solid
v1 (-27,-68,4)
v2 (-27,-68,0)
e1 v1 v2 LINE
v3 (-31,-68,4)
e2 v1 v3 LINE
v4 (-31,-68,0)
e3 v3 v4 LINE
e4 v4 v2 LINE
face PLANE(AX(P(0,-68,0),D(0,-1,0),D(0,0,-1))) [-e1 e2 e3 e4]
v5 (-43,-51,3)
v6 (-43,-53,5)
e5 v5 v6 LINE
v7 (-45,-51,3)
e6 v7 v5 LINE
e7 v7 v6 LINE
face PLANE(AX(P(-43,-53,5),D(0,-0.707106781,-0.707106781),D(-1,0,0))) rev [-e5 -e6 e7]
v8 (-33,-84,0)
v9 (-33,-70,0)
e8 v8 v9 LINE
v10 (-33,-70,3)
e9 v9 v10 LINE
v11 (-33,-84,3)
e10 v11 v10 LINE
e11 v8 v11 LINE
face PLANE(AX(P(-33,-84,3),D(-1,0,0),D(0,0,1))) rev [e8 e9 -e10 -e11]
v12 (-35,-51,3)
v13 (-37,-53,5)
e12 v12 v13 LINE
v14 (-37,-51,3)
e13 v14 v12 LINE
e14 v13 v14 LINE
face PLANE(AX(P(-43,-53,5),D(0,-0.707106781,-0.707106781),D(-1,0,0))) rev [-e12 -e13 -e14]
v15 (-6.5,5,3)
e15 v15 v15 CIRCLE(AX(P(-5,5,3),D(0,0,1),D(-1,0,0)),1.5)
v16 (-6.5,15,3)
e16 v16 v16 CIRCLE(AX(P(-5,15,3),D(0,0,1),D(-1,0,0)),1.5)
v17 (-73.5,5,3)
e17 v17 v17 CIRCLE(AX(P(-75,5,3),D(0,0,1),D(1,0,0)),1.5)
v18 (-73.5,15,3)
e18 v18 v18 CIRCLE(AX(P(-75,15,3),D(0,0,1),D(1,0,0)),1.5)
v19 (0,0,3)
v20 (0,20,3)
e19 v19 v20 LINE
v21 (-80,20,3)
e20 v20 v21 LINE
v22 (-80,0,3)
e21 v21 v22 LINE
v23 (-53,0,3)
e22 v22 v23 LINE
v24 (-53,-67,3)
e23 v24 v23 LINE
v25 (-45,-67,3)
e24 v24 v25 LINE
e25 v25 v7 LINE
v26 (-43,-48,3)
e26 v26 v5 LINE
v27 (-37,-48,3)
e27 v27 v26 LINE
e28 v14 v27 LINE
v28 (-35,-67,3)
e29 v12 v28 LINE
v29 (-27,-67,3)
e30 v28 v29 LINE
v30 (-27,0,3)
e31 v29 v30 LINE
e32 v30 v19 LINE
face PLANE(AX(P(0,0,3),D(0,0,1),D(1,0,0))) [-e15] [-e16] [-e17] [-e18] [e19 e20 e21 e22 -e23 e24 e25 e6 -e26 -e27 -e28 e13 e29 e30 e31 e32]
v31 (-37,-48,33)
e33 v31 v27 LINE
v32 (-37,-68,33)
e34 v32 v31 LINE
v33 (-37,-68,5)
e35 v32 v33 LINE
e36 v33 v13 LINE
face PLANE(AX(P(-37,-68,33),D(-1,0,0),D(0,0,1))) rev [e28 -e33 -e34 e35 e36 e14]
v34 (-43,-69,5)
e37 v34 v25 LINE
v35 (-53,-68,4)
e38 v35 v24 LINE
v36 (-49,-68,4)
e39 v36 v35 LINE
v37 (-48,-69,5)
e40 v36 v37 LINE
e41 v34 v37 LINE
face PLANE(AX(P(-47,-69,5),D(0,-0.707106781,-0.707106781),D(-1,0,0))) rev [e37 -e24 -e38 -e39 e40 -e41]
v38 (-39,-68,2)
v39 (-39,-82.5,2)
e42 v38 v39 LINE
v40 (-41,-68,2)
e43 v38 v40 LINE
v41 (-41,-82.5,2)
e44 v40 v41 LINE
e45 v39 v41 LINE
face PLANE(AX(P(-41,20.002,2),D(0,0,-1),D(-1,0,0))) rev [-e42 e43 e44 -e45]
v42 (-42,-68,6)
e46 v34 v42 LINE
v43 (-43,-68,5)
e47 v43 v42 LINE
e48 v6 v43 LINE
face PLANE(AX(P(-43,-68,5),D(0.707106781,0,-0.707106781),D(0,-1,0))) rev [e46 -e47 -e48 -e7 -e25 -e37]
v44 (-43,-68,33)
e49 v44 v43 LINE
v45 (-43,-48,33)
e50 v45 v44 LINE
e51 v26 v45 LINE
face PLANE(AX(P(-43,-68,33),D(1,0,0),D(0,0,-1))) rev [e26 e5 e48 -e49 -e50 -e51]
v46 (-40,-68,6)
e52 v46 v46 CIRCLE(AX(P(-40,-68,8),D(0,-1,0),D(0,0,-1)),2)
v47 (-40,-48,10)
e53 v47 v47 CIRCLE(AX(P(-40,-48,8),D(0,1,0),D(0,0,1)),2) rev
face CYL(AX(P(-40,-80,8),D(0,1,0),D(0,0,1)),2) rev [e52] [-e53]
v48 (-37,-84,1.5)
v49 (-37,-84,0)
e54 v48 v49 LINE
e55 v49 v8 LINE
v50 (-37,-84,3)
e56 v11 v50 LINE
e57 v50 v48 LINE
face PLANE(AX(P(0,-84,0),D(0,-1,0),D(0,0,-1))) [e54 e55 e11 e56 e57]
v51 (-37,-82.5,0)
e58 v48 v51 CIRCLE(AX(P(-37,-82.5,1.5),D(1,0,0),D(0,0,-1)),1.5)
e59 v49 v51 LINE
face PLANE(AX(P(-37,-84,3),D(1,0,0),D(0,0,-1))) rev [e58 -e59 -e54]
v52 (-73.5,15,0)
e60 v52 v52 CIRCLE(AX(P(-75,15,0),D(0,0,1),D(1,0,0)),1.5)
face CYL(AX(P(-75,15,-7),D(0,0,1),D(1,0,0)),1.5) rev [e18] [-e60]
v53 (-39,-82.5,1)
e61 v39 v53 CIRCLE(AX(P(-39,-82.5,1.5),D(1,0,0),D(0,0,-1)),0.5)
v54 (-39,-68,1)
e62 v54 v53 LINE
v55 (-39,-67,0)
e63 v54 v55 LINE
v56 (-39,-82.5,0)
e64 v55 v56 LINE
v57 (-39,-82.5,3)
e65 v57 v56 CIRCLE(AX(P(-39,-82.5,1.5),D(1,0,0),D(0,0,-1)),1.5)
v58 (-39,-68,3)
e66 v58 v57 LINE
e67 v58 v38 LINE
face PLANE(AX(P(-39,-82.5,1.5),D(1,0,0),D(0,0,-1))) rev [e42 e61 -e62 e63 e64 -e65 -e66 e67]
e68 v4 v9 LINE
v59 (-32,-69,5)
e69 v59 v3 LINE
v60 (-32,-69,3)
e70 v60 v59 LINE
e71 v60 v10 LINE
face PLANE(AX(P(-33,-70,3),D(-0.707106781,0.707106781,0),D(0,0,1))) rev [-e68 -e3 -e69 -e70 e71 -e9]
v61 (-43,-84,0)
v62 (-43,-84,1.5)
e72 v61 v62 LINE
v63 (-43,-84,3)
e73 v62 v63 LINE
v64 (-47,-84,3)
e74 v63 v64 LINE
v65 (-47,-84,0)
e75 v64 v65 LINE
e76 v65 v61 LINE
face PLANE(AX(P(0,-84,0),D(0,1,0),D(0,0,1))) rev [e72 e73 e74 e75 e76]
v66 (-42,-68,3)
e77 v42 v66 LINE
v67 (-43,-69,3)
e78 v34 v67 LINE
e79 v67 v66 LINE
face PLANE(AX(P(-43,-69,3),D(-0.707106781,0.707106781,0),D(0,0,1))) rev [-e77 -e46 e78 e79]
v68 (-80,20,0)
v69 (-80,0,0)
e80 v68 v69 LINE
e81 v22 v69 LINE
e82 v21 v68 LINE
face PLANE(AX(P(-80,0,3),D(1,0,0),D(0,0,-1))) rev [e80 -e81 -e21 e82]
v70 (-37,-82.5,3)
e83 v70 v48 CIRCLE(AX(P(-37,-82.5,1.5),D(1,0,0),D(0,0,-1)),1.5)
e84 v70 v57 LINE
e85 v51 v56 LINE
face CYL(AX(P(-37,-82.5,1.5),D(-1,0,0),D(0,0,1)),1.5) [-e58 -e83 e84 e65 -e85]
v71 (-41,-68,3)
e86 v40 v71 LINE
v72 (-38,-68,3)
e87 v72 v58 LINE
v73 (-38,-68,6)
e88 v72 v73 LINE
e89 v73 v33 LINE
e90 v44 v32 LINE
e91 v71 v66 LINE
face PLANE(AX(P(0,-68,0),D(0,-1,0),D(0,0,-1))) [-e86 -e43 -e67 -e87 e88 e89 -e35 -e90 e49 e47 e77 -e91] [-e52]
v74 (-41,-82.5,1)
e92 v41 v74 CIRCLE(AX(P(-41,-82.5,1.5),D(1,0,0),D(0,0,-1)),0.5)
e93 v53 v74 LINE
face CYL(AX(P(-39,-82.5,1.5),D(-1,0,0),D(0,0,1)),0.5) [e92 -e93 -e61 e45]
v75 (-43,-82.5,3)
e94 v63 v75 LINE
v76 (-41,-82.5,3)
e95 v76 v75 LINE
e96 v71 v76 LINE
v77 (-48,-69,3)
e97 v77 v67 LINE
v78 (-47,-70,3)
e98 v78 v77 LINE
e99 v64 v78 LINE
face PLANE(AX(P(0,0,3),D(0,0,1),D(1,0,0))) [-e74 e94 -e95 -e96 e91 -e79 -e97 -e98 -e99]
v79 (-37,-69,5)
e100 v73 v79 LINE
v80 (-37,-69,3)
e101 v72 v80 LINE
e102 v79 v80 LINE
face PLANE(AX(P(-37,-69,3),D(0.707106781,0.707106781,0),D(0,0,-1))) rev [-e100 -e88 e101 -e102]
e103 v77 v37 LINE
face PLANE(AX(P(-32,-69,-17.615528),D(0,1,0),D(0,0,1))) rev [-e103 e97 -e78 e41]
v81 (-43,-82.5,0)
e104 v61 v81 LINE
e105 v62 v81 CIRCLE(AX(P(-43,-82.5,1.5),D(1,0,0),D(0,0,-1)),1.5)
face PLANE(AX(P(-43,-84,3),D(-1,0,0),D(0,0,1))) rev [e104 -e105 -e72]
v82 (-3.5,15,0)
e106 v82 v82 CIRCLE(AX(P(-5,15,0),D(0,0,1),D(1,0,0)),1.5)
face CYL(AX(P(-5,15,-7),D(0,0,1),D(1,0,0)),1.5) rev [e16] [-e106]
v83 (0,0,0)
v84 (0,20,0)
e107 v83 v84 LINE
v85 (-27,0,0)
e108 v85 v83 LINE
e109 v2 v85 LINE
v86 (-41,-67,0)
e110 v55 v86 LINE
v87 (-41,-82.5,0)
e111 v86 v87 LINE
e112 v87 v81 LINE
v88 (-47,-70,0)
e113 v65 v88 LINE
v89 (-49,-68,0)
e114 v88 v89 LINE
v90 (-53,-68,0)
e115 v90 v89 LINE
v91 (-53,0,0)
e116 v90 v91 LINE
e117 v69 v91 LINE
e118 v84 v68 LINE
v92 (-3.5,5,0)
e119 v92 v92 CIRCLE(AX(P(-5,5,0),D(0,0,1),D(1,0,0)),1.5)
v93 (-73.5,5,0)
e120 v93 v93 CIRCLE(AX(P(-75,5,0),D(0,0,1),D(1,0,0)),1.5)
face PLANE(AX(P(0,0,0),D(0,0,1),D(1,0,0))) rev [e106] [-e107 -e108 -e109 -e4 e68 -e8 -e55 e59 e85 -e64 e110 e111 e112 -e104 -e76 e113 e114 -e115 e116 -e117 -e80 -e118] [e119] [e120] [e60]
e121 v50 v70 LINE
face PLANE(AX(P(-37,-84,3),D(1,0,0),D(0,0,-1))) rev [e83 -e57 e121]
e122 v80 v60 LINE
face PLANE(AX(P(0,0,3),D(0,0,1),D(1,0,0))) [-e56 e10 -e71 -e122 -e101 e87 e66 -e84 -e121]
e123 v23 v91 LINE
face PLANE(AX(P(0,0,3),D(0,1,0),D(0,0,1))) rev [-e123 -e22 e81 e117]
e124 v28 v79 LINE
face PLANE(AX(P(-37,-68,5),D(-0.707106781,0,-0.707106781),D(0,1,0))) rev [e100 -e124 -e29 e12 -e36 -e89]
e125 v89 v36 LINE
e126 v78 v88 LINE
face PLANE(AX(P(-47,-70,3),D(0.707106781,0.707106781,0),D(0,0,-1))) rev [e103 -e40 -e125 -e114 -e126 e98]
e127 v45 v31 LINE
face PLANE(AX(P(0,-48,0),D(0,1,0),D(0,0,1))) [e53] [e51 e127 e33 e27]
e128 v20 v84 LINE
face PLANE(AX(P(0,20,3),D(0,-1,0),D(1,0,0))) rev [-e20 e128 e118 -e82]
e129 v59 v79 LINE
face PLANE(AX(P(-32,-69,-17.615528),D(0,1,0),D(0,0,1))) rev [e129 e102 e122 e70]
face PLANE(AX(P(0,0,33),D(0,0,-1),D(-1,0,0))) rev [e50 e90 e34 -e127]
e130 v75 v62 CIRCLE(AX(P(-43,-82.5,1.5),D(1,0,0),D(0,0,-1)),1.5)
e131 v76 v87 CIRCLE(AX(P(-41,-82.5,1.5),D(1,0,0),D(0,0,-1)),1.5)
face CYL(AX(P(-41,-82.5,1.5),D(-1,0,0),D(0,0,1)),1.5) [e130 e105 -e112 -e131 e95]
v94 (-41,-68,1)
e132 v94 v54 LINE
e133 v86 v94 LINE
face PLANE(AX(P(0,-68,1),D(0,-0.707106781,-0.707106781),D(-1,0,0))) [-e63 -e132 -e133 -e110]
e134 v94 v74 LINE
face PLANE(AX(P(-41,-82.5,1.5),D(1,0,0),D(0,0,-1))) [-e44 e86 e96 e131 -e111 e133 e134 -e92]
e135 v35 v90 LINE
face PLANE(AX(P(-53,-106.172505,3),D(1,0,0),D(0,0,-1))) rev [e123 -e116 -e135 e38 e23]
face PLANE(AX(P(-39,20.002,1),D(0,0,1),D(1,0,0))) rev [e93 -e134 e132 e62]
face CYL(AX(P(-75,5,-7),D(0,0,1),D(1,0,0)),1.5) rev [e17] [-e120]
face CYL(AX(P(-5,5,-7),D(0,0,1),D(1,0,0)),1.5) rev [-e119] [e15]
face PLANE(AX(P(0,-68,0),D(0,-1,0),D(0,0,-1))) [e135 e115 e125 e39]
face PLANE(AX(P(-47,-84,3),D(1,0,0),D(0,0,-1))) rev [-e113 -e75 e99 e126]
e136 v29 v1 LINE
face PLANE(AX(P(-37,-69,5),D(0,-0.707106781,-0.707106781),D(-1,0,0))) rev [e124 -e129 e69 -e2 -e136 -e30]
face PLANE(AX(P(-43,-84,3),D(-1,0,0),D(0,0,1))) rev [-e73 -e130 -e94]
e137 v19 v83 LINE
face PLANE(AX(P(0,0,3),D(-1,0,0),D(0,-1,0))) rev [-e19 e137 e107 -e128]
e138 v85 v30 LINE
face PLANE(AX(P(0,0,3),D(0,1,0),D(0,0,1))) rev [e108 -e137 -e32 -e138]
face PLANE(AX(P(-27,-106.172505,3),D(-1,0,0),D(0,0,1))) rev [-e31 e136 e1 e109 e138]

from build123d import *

# Parameters (mm, degrees)
SKETCH_1_W           = 80
SKETCH_1_H           = 20
EXTRUDE_1_DEPTH      = 3
SKETCH_2_W           = 6
SKETCH_2_H           = 20
EXTRUDE_2_DEPTH      = 95
SKETCH_3_W           = 6
SKETCH_3_H           = 15
EXTRUDE_3_DEPTH      = 80
CHAMFER_1_SIZE       = 10
CHAMFER_2_SIZE       = 10
FILLET_1_R           = 10
SKETCH_4_W           = 6
SKETCH_4_H           = 15
EXTRUDE_4_DEPTH      = 5
SKETCH_5_W           = 6
SKETCH_5_H           = 15
EXTRUDE_5_DEPTH      = 5
FILLET_2_R           = 2
CHAMFER_3_SIZE       = 3
SKETCH_6_R           = 1.5
CUT_EXTRUDE_1_DEPTH  = 30
SKETCH_7_W           = 26
SKETCH_7_H           = 3
EXTRUDE_6_DEPTH      = 68
CHAMFER_4_SIZE       = 10
SKETCH_8_W           = 6
SKETCH_8_H           = 13
EXTRUDE_7_DEPTH      = 100
CHAMFER_5_SIZE       = 5
CHAMFER_6_SIZE       = 2
SKETCH_9_W           = 99.532664039
SKETCH_9_H           = 104.077347625
CUT_EXTRUDE_3_DEPTH  = 30
SKETCH_14_W          = 15.593287018
SKETCH_14_H          = 53.78968733
CUT_EXTRUDE_5_DEPTH  = 57
SKETCH_15_W          = 6
SKETCH_15_H          = 25
EXTRUDE_8_DEPTH      = 5
SKETCH_16_W          = 6
SKETCH_16_H          = 25
EXTRUDE_9_DEPTH      = 5
CHAMFER_7_SIZE       = 5
SKETCH_17_W          = 6
SKETCH_17_H          = 23
CUT_EXTRUDE_6_DEPTH  = 100
SKETCH_20_W          = 26.699145715
SKETCH_20_H          = 4.006007242
CUT_EXTRUDE_7_DEPTH  = 133
SKETCH_21_W          = 6
SKETCH_21_H          = 15
EXTRUDE_11_DEPTH     = 30
SKETCH_22_R          = 2
CUT_EXTRUDE_8_DEPTH  = 27
EXTRUDE_12_DEPTH     = 3
SKETCH_26_W          = 4
SKETCH_26_H          = 3
EXTRUDE_14_DEPTH     = 16
SKETCH_27_W          = 4
SKETCH_27_H          = 13
EXTRUDE_21_DEPTH     = 6
SKETCH_28_R          = 1.5
CUT_EXTRUDE_9_DEPTH  = 22
CHAMFER_9_SIZE       = 2
CHAMFER_10_SIZE      = 2
CHAMFER_11_SIZE      = 1
SKETCH_29_W          = 6
SKETCH_29_H          = 28
EXTRUDE_22_DEPTH     = 20
SKETCH_30_W          = 6
SKETCH_30_H          = 20
EXTRUDE_23_DEPTH     = 2
CUT_EXTRUDE_START    = -20
SKETCH_31_R          = 2
CUT_EXTRUDE_10_DEPTH = 20
SKETCH_32_R          = 1.5
CUT_EXTRUDE_11_DEPTH = 10
SKETCH_33_W          = 6
SKETCH_33_H          = 30
CUT_EXTRUDE_12_DEPTH = 15
CUT_EXTRUDE_13_DEPTH = 6
EXTRUDE_24_DEPTH     = 2
EXTRUDE_25_REACH     = 136.146
SKETCH_37_W          = 2
SKETCH_37_H          = 3
EXTRUDE_26_DEPTH     = 2
EXTRUDE_27_DEPTH     = 2
EXTRUDE_28_REACH     = 136.146
CHAMFER_12_SIZE      = 1


# Some blends are built 0.0001 mm under size
with BuildPart() as part:
    # 草图1 → 凸台-拉伸1 (new body)
    with BuildSketch(Plane.XY):
        with Locations((-40, 10)):
            Rectangle(SKETCH_1_W, SKETCH_1_H)
    extrude(amount=EXTRUDE_1_DEPTH)

    # 草图2 → 凸台-拉伸2 (add)
    with BuildSketch(Plane.XY.offset(3)):
        with Locations((-40, 10)):
            Rectangle(SKETCH_2_W, SKETCH_2_H)
    extrude(amount=EXTRUDE_2_DEPTH)

    # 草图3 → 凸台-拉伸3 (add)
    with BuildSketch(Plane.XZ):
        with Locations((-40, 90.5)):
            Rectangle(SKETCH_3_W, SKETCH_3_H)
    extrude(amount=EXTRUDE_3_DEPTH)

    # 倒角1
    chamfer_1_edges = [part.edges().sort_by_distance(p)[0] for p in [
        (-43, 10, 3),
        (-37, 10, 3),
    ]]
    chamfer(chamfer_1_edges, length=CHAMFER_1_SIZE)

    # 倒角2
    chamfer_2_edges = [part.edges().sort_by_distance(p)[0] for p in [
        (-40, 0, 83),
    ]]
    chamfer(chamfer_2_edges, length=CHAMFER_2_SIZE)

    # 圆角1
    fillet_1_edges = [part.edges().sort_by_distance(p)[0] for p in [
        (-40, 20, 98),
    ]]
    fillet(fillet_1_edges, radius=FILLET_1_R)

    # 草图4 → 凸台-拉伸4 (add)
    with BuildSketch(Plane(origin=(0, 0, 83), x_dir=(-1, 0, 0), z_dir=(0, 0, -1))):
        with Locations((40, -72.5)):
            Rectangle(SKETCH_4_W, SKETCH_4_H)
    extrude(amount=EXTRUDE_4_DEPTH)

    # 草图5 → 凸台-拉伸5 (add)
    with BuildSketch(Plane.XY.offset(98)):
        with Locations((-40, -72.5)):
            Rectangle(SKETCH_5_W, SKETCH_5_H)
    extrude(amount=EXTRUDE_5_DEPTH)

    # 圆角2
    fillet_2_edges = [part.edges().sort_by_distance(p)[0] for p in [
        (-40, -65, 78),
        (-40, -65, 103),
    ]]
    fillet(fillet_2_edges, radius=FILLET_2_R)

    # 倒角3
    chamfer_3_edges = [part.edges().sort_by_distance(p)[0] for p in [
        (-40, -65, 83),
        (-40, -65, 98),
    ]]
    chamfer(chamfer_3_edges, length=CHAMFER_3_SIZE - 0.0001)  # a hair under: the kernel refuses the full size

    # 草图6 → 切除-拉伸1 (cut)
    with BuildSketch(Plane.XZ):
        with Locations(Location((-40, 8, 0), (0, 0, 270))):
            Circle(SKETCH_6_R)
        with Locations(Location((-40, 23, 0), (0, 0, 270))):
            Circle(SKETCH_6_R)
    extrude(amount=-CUT_EXTRUDE_1_DEPTH, mode=Mode.SUBTRACT)

    # 草图7 → 凸台-拉伸6 (add)
    with BuildSketch(Plane.XZ):
        with Locations((-40, 1.5)):
            Rectangle(SKETCH_7_W, SKETCH_7_H)
    extrude(amount=EXTRUDE_6_DEPTH)

    # 倒角4
    chamfer_4_edges = [part.edges().sort_by_distance(p)[0] for p in [
        (-53, -68, 1.5),
        (-27, -68, 1.5),
    ]]
    chamfer(chamfer_4_edges, length=CHAMFER_4_SIZE)

    # 草图8 → 凸台-拉伸7 (add)
    with BuildSketch(Plane.XY.offset(3)):
        with Locations((-40, -73.5)):
            Rectangle(SKETCH_8_W, SKETCH_8_H)
    extrude(amount=EXTRUDE_7_DEPTH)

    # 倒角5
    chamfer_5_edges = [part.edges().sort_by_distance(p)[0] for p in [
        (-40, -67, 3),
    ]]
    chamfer(chamfer_5_edges, length=CHAMFER_5_SIZE)

    # 倒角6
    # the kernel refuses this chamfer: 2 mm, written as the material it adds along each edge
    with BuildSketch(Plane(origin=(-37, -56.856634024, 3), x_dir=(1, 0, 0), z_dir=(0, -1, 0))) as chamfer_6_piece_1_section:
        Polygon((CHAMFER_6_SIZE, 0), (0, CHAMFER_6_SIZE), (0, 0), align=None)
    chamfer_6_piece_1 = extrude(amount=16.286731952, mode=Mode.PRIVATE)
    chamfer_6_piece_1 = split(chamfer_6_piece_1, bisect_by=Plane(origin=(-37, -59.428317012, 0.428317012), z_dir=(0, -0.7071067811865476, -0.7071067811865476)), keep=Keep.TOP, mode=Mode.PRIVATE)
    chamfer_6_piece_1 = split(chamfer_6_piece_1, bisect_by=Plane(origin=(-31.428317012, -62.428317012, 3), z_dir=(-0.7071067811865475, 0.7071067811865477, -1.922962686383564e-15)), keep=Keep.TOP, mode=Mode.PRIVATE)
    add(chamfer_6_piece_1)
    with BuildSketch(Plane(origin=(-43, -73.143365976, 3), x_dir=(-1, 0, 0), z_dir=(0, 1, 0))) as chamfer_6_piece_2_section:
        Polygon((CHAMFER_6_SIZE, 0), (0, CHAMFER_6_SIZE), (0, 0), align=None)
    chamfer_6_piece_2 = extrude(amount=16.286731952, mode=Mode.PRIVATE)
    chamfer_6_piece_2 = split(chamfer_6_piece_2, bisect_by=Plane(origin=(-43, -67.571682988, 8.571682988), z_dir=(0, -0.7071067811865476, -0.7071067811865476)), keep=Keep.TOP, mode=Mode.PRIVATE)
    chamfer_6_piece_2 = split(chamfer_6_piece_2, bisect_by=Plane(origin=(-40.428317012, -70.571682988, 3), z_dir=(0.7071067811865476, 0.7071067811865476, 3.5574809698095944e-15)), keep=Keep.TOP, mode=Mode.PRIVATE)
    add(chamfer_6_piece_2)

    # 草图9 → 切除-拉伸3 (cut)
    with BuildSketch(Plane(origin=(0, 20, 0), x_dir=(1, 0, 0), z_dir=(0, 1, 0))):
        with Locations((-30.233667981, -55.038673813)):
            Rectangle(SKETCH_9_W, SKETCH_9_H)
    extrude(amount=-CUT_EXTRUDE_3_DEPTH, mode=Mode.SUBTRACT)

    # 草图14 → 切除-拉伸5 (cut)
    with BuildSketch(Plane(origin=(0, -10, 0), x_dir=(1, 0, 0), z_dir=(0, 1, 0))):
        with Locations((-38.927067407, -81.040006974)):
            Rectangle(SKETCH_14_W, SKETCH_14_H)
    extrude(amount=-CUT_EXTRUDE_5_DEPTH, mode=Mode.SUBTRACT)

    # 草图15 → 凸台-拉伸8 (add)
    with BuildSketch(Plane(origin=(0, -67, 0), x_dir=(1, 0, 0), z_dir=(0, 1, 0))):
        with Locations((-40, -90.5)):
            Rectangle(SKETCH_15_W, SKETCH_15_H)
    extrude(amount=EXTRUDE_8_DEPTH)

    # 草图16 → 凸台-拉伸9 (add)
    with BuildSketch(Plane.XZ.offset(80)):
        with Locations((-40, 90.5)):
            Rectangle(SKETCH_16_W, SKETCH_16_H)
    extrude(amount=EXTRUDE_9_DEPTH)

    # 倒角7
    chamfer_7_edges = [part.edges().sort_by_distance(p)[0] for p in [
        (-40, -80, 78),
        (-40, -67, 78),
    ]]
    chamfer(chamfer_7_edges, length=CHAMFER_7_SIZE - 0.0001)  # a hair under: the kernel refuses the full size

    # 草图17 → 切除-拉伸6 (cut)
    with BuildSketch(Plane.XY.offset(103)):
        with Locations((-40, -73.5)):
            Rectangle(SKETCH_17_W, SKETCH_17_H)
    extrude(amount=-CUT_EXTRUDE_6_DEPTH, mode=Mode.SUBTRACT)

    # 草图20 → 切除-拉伸7 (cut)
    with BuildSketch(Plane(origin=(0, 20, 0), x_dir=(1, 0, 0), z_dir=(0, 1, 0))):
        with Locations((-37.936501357, -5.003003621)):
            Rectangle(SKETCH_20_W, SKETCH_20_H)
    extrude(amount=-CUT_EXTRUDE_7_DEPTH, mode=Mode.SUBTRACT)

    # 草图21 → 凸台-拉伸11 (add)
    with BuildSketch(Plane.XY.offset(3)):
        with Locations((-40, -60.5)):
            Rectangle(SKETCH_21_W, SKETCH_21_H)
    extrude(amount=EXTRUDE_11_DEPTH)

    # 草图22 → 切除-拉伸8 (cut)
    with BuildSketch(Plane(origin=(0, -53, 0), x_dir=(1, 0, 0), z_dir=(0, 1, 0))):
        with Locations(Location((-40, -8, 0), (0, 0, 270))):
            Circle(SKETCH_22_R)
    extrude(amount=-CUT_EXTRUDE_8_DEPTH, mode=Mode.SUBTRACT)

    # 草图24 → 凸台-拉伸12 (add)
    with BuildSketch(Plane(origin=(0, 0, 0), x_dir=(-1, 0, 0), z_dir=(0, 0, -1))):
        Polygon((27, -58), (27, -68), (37, -68), align=None)
        Polygon((53, -58), (53, -68), (43, -68), align=None)
    extrude(amount=-EXTRUDE_12_DEPTH)

    # 草图26 → 凸台-拉伸14 (add)
    with BuildSketch(Plane.XZ.offset(68)):
        with Locations((-45, 1.5)):
            Rectangle(SKETCH_26_W, SKETCH_26_H)
        with Locations((-35, 1.5)):
            Rectangle(SKETCH_26_W, SKETCH_26_H)
    extrude(amount=EXTRUDE_14_DEPTH)

    # 草图27 → 凸台-拉伸21 (add)
    with BuildSketch(Plane.XY.offset(3)):
        with Locations((-45, -75.5)):
            Rectangle(SKETCH_27_W, SKETCH_27_H)
        with Locations((-35, -75.5)):
            Rectangle(SKETCH_27_W, SKETCH_27_H)
    extrude(amount=EXTRUDE_21_DEPTH)

    # 草图28 → 切除-拉伸9 (cut)
    with BuildSketch(Plane(origin=(-33, 0, 0), x_dir=(0, 0, -1), z_dir=(1, 0, 0))):
        with Locations((-6, -75.5)):
            Circle(SKETCH_28_R)
    extrude(amount=-CUT_EXTRUDE_9_DEPTH, mode=Mode.SUBTRACT)

    # 倒角8
    # the kernel refuses this chamfer: 2 mm, written as the material it adds along each edge
    with BuildSketch(Plane(origin=(-53.152771873, -69, 3), x_dir=(0, 1, 0), z_dir=(1, 0, 0))) as chamfer_8_piece_1_section:
        with BuildLine():
            Line((2.424264069, -0.424264069), (-0.424264069, 2.424264069))
            Line((-0.424264069, 2.424264069), (-0.724264069, 2.424264069))
            ThreePointArc((-0.724264069, 2.424264069), (-0.3, 1.212132034), (-0.3, 0))
            Line((-0.3, 0), (0, -0.3))
            ThreePointArc((0, -0.3), (1.212132034, -0.3), (2.424264069, -0.724264069))
            Line((2.424264069, -0.724264069), (2.424264069, -0.424264069))
        make_face()
    chamfer_8_piece_1 = extrude(amount=10.152771873, mode=Mode.PRIVATE)
    chamfer_8_piece_1 = split(chamfer_8_piece_1, bisect_by=Plane(origin=(-47, -69, 3), z_dir=(-1, 0, 0)), keep=Keep.TOP, mode=Mode.PRIVATE)
    chamfer_8_piece_1 = split(chamfer_8_piece_1, bisect_by=Plane(origin=(-53.152771873, -68, 3), z_dir=(0, 1, 0)), keep=Keep.TOP, mode=Mode.PRIVATE)
    chamfer_8_piece_1 = split(chamfer_8_piece_1, bisect_by=Plane(origin=(-53, -69, 3), z_dir=(1, 0, 0)), keep=Keep.TOP, mode=Mode.PRIVATE)
    add(chamfer_8_piece_1)
    with BuildSketch(Plane(origin=(-47, -69, 3), x_dir=(0, 1, 0), z_dir=(1, 0, 0))) as chamfer_8_piece_2_section:
        with BuildLine():
            Line((2.424264069, -0.424264069), (-0.424264069, 2.424264069))
            Line((-0.424264069, 2.424264069), (-0.724264069, 2.424264069))
            ThreePointArc((-0.724264069, 2.424264069), (-0.3, 1.212132034), (-0.3, 0))
            Line((-0.3, 0), (0, -0.3))
            ThreePointArc((0, -0.3), (1.212132034, -0.3), (2.424264069, -0.724264069))
            Line((2.424264069, -0.724264069), (2.424264069, -0.424264069))
        make_face()
    chamfer_8_piece_2 = extrude(amount=4, mode=Mode.PRIVATE)
    chamfer_8_piece_2 = split(chamfer_8_piece_2, bisect_by=Plane(origin=(-47, -68, 3), z_dir=(0, 1, 0)), keep=Keep.TOP, mode=Mode.PRIVATE)
    add(chamfer_8_piece_2)
    with BuildSketch(Plane(origin=(-47, -69, 3), x_dir=(0, 1, 0), z_dir=(1, 0, 0))) as chamfer_8_piece_3_section:
        with BuildLine():
            Line((2.424264069, -0.424264069), (-0.424264069, 2.424264069))
            Line((-0.424264069, 2.424264069), (-0.724264069, 2.424264069))
            ThreePointArc((-0.724264069, 2.424264069), (-0.3, 1.212132034), (-0.3, 0))
            Line((-0.3, 0), (0, -0.3))
            ThreePointArc((0, -0.3), (1.212132034, -0.3), (2.424264069, -0.724264069))
            Line((2.424264069, -0.724264069), (2.424264069, -0.424264069))
        make_face()
    chamfer_8_piece_3 = extrude(amount=4, mode=Mode.PRIVATE)
    chamfer_8_piece_3 = split(chamfer_8_piece_3, bisect_by=Plane(origin=(-47, -68, 3), z_dir=(0, -1, 0)), keep=Keep.TOP, mode=Mode.PRIVATE)
    add(chamfer_8_piece_3)
    with BuildSketch(Plane(origin=(-47, -69, 3), x_dir=(0, 1, 0), z_dir=(1, 0, 0))) as chamfer_8_piece_4_section:
        with BuildLine():
            Line((2.424264069, -0.424264069), (-0.424264069, 2.424264069))
            Line((-0.424264069, 2.424264069), (-0.724264069, 2.424264069))
            ThreePointArc((-0.724264069, 2.424264069), (-0.3, 1.212132034), (-0.3, 0))
            Line((-0.3, 0), (0, -0.3))
            ThreePointArc((0, -0.3), (1.212132034, -0.3), (2.424264069, -0.724264069))
            Line((2.424264069, -0.724264069), (2.424264069, -0.424264069))
        make_face()
    chamfer_8_piece_4 = extrude(amount=10.152771873, mode=Mode.PRIVATE)
    chamfer_8_piece_4 = split(chamfer_8_piece_4, bisect_by=Plane(origin=(-37, -69, 3), z_dir=(-1, 0, 0)), keep=Keep.TOP, mode=Mode.PRIVATE)
    chamfer_8_piece_4 = split(chamfer_8_piece_4, bisect_by=Plane(origin=(-43, -69, 3), z_dir=(1, 0, 0)), keep=Keep.TOP, mode=Mode.PRIVATE)
    chamfer_8_piece_4 = split(chamfer_8_piece_4, bisect_by=Plane(origin=(-47, -68, 3), z_dir=(0, 1, 0)), keep=Keep.TOP, mode=Mode.PRIVATE)
    add(chamfer_8_piece_4)
    with BuildSketch(Plane(origin=(-47, -69, 3), x_dir=(0, 1, 0), z_dir=(1, 0, 0))) as chamfer_8_piece_5_section:
        with BuildLine():
            Line((2.424264069, -0.424264069), (-0.424264069, 2.424264069))
            Line((-0.424264069, 2.424264069), (-0.724264069, 2.424264069))
            ThreePointArc((-0.724264069, 2.424264069), (-0.3, 1.212132034), (-0.3, 0))
            Line((-0.3, 0), (0, -0.3))
            ThreePointArc((0, -0.3), (1.212132034, -0.3), (2.424264069, -0.724264069))
            Line((2.424264069, -0.724264069), (2.424264069, -0.424264069))
        make_face()
    chamfer_8_piece_5 = extrude(amount=10.152771873, mode=Mode.PRIVATE)
    chamfer_8_piece_5 = split(chamfer_8_piece_5, bisect_by=Plane(origin=(-37, -69, 3), z_dir=(1, 0, 0)), keep=Keep.TOP, mode=Mode.PRIVATE)
    chamfer_8_piece_5 = split(chamfer_8_piece_5, bisect_by=Plane(origin=(-47, -68, 3), z_dir=(0, 1, 0)), keep=Keep.TOP, mode=Mode.PRIVATE)
    add(chamfer_8_piece_5)
    with BuildSketch(Plane(origin=(-47, -69, 3), x_dir=(0, 1, 0), z_dir=(1, 0, 0))) as chamfer_8_piece_6_section:
        with BuildLine():
            Line((2.424264069, -0.424264069), (-0.424264069, 2.424264069))
            Line((-0.424264069, 2.424264069), (-0.724264069, 2.424264069))
            ThreePointArc((-0.724264069, 2.424264069), (-0.3, 1.212132034), (-0.3, 0))
            Line((-0.3, 0), (0, -0.3))
            ThreePointArc((0, -0.3), (1.212132034, -0.3), (2.424264069, -0.724264069))
            Line((2.424264069, -0.724264069), (2.424264069, -0.424264069))
        make_face()
    chamfer_8_piece_6 = extrude(amount=10.152771873, mode=Mode.PRIVATE)
    chamfer_8_piece_6 = split(chamfer_8_piece_6, bisect_by=Plane(origin=(-37, -69, 3), z_dir=(1, 0, 0)), keep=Keep.TOP, mode=Mode.PRIVATE)
    chamfer_8_piece_6 = split(chamfer_8_piece_6, bisect_by=Plane(origin=(-47, -68, 3), z_dir=(0, -1, 0)), keep=Keep.TOP, mode=Mode.PRIVATE)
    add(chamfer_8_piece_6)
    with BuildSketch(Plane(origin=(-43.152771873, -69, 3), x_dir=(0, 1, 0), z_dir=(1, 0, 0))) as chamfer_8_piece_7_section:
        with BuildLine():
            Line((2.424264069, -0.424264069), (-0.424264069, 2.424264069))
            Line((-0.424264069, 2.424264069), (-0.724264069, 2.424264069))
            ThreePointArc((-0.724264069, 2.424264069), (-0.3, 1.212132034), (-0.3, 0))
            Line((-0.3, 0), (0, -0.3))
            ThreePointArc((0, -0.3), (1.212132034, -0.3), (2.424264069, -0.724264069))
            Line((2.424264069, -0.724264069), (2.424264069, -0.424264069))
        make_face()
    chamfer_8_piece_7 = extrude(amount=10.152771873, mode=Mode.PRIVATE)
    chamfer_8_piece_7 = split(chamfer_8_piece_7, bisect_by=Plane(origin=(-43.152771873, -68, 3), z_dir=(0, 1, 0)), keep=Keep.TOP, mode=Mode.PRIVATE)
    chamfer_8_piece_7 = split(chamfer_8_piece_7, bisect_by=Plane(origin=(-43, -69, 3), z_dir=(-1, 0, 0)), keep=Keep.TOP, mode=Mode.PRIVATE)
    add(chamfer_8_piece_7)
    with BuildSketch(Plane(origin=(-43.152771873, -69, 3), x_dir=(0, 1, 0), z_dir=(1, 0, 0))) as chamfer_8_piece_8_section:
        with BuildLine():
            Line((2.424264069, -0.424264069), (-0.424264069, 2.424264069))
            Line((-0.424264069, 2.424264069), (-0.724264069, 2.424264069))
            ThreePointArc((-0.724264069, 2.424264069), (-0.3, 1.212132034), (-0.3, 0))
            Line((-0.3, 0), (0, -0.3))
            ThreePointArc((0, -0.3), (1.212132034, -0.3), (2.424264069, -0.724264069))
            Line((2.424264069, -0.724264069), (2.424264069, -0.424264069))
        make_face()
    chamfer_8_piece_8 = extrude(amount=10.152771873, mode=Mode.PRIVATE)
    chamfer_8_piece_8 = split(chamfer_8_piece_8, bisect_by=Plane(origin=(-43.152771873, -68, 3), z_dir=(0, -1, 0)), keep=Keep.TOP, mode=Mode.PRIVATE)
    chamfer_8_piece_8 = split(chamfer_8_piece_8, bisect_by=Plane(origin=(-43, -69, 3), z_dir=(-1, 0, 0)), keep=Keep.TOP, mode=Mode.PRIVATE)
    add(chamfer_8_piece_8)
    with BuildSketch(Plane(origin=(-43.152771873, -69, 3), x_dir=(0, 1, 0), z_dir=(1, 0, 0))) as chamfer_8_piece_9_section:
        with BuildLine():
            Line((2.424264069, -0.424264069), (-0.424264069, 2.424264069))
            Line((-0.424264069, 2.424264069), (-0.724264069, 2.424264069))
            ThreePointArc((-0.724264069, 2.424264069), (-0.3, 1.212132034), (-0.3, 0))
            Line((-0.3, 0), (0, -0.3))
            ThreePointArc((0, -0.3), (1.212132034, -0.3), (2.424264069, -0.724264069))
            Line((2.424264069, -0.724264069), (2.424264069, -0.424264069))
        make_face()
    chamfer_8_piece_9 = extrude(amount=10.152771873, mode=Mode.PRIVATE)
    chamfer_8_piece_9 = split(chamfer_8_piece_9, bisect_by=Plane(origin=(-43.152771873, -68, 3), z_dir=(0, 1, 0)), keep=Keep.TOP, mode=Mode.PRIVATE)
    chamfer_8_piece_9 = split(chamfer_8_piece_9, bisect_by=Plane(origin=(-37, -69, 3), z_dir=(-1, 0, 0)), keep=Keep.TOP, mode=Mode.PRIVATE)
    chamfer_8_piece_9 = split(chamfer_8_piece_9, bisect_by=Plane(origin=(-43, -69, 3), z_dir=(1, 0, 0)), keep=Keep.TOP, mode=Mode.PRIVATE)
    add(chamfer_8_piece_9)
    with BuildSketch(Plane(origin=(-37, -69, 3), x_dir=(0, 1, 0), z_dir=(1, 0, 0))) as chamfer_8_piece_10_section:
        with BuildLine():
            Line((2.424264069, -0.424264069), (-0.424264069, 2.424264069))
            Line((-0.424264069, 2.424264069), (-0.724264069, 2.424264069))
            ThreePointArc((-0.724264069, 2.424264069), (-0.3, 1.212132034), (-0.3, 0))
            Line((-0.3, 0), (0, -0.3))
            ThreePointArc((0, -0.3), (1.212132034, -0.3), (2.424264069, -0.724264069))
            Line((2.424264069, -0.724264069), (2.424264069, -0.424264069))
        make_face()
    chamfer_8_piece_10 = extrude(amount=4, mode=Mode.PRIVATE)
    chamfer_8_piece_10 = split(chamfer_8_piece_10, bisect_by=Plane(origin=(-37, -68, 3), z_dir=(0, 1, 0)), keep=Keep.TOP, mode=Mode.PRIVATE)
    add(chamfer_8_piece_10)
    with BuildSketch(Plane(origin=(-37, -69, 3), x_dir=(0, 1, 0), z_dir=(1, 0, 0))) as chamfer_8_piece_11_section:
        with BuildLine():
            Line((2.424264069, -0.424264069), (-0.424264069, 2.424264069))
            Line((-0.424264069, 2.424264069), (-0.724264069, 2.424264069))
            ThreePointArc((-0.724264069, 2.424264069), (-0.3, 1.212132034), (-0.3, 0))
            Line((-0.3, 0), (0, -0.3))
            ThreePointArc((0, -0.3), (1.212132034, -0.3), (2.424264069, -0.724264069))
            Line((2.424264069, -0.724264069), (2.424264069, -0.424264069))
        make_face()
    chamfer_8_piece_11 = extrude(amount=4, mode=Mode.PRIVATE)
    chamfer_8_piece_11 = split(chamfer_8_piece_11, bisect_by=Plane(origin=(-37, -68, 3), z_dir=(0, -1, 0)), keep=Keep.TOP, mode=Mode.PRIVATE)
    add(chamfer_8_piece_11)
    with BuildSketch(Plane(origin=(-37, -69, 3), x_dir=(0, 1, 0), z_dir=(1, 0, 0))) as chamfer_8_piece_12_section:
        with BuildLine():
            Line((2.424264069, -0.424264069), (-0.424264069, 2.424264069))
            Line((-0.424264069, 2.424264069), (-0.724264069, 2.424264069))
            ThreePointArc((-0.724264069, 2.424264069), (-0.3, 1.212132034), (-0.3, 0))
            Line((-0.3, 0), (0, -0.3))
            ThreePointArc((0, -0.3), (1.212132034, -0.3), (2.424264069, -0.724264069))
            Line((2.424264069, -0.724264069), (2.424264069, -0.424264069))
        make_face()
    chamfer_8_piece_12 = extrude(amount=10.152771873, mode=Mode.PRIVATE)
    chamfer_8_piece_12 = split(chamfer_8_piece_12, bisect_by=Plane(origin=(-27, -69, 3), z_dir=(-1, 0, 0)), keep=Keep.TOP, mode=Mode.PRIVATE)
    chamfer_8_piece_12 = split(chamfer_8_piece_12, bisect_by=Plane(origin=(-37, -68, 3), z_dir=(0, 1, 0)), keep=Keep.TOP, mode=Mode.PRIVATE)
    chamfer_8_piece_12 = split(chamfer_8_piece_12, bisect_by=Plane(origin=(-33, -69, 3), z_dir=(1, 0, 0)), keep=Keep.TOP, mode=Mode.PRIVATE)
    add(chamfer_8_piece_12)

    # 倒角9
    # the kernel refuses this chamfer: 2 mm, written as the material it adds along each edge
    with BuildSketch(Plane(origin=(-43, -53, 3), x_dir=(0, 0, 1), z_dir=(0, -1, 0)), Plane(origin=(-37, -72.143365976, 3), x_dir=(0, 0, 1), z_dir=(0, 1, 0))) as chamfer_9_piece_1:
        Polygon((CHAMFER_9_SIZE, 0), (0, CHAMFER_9_SIZE), (0, 0), align=None)
    extrude(amount=19.143365976)
    with BuildSketch(Plane(origin=(-37, -53, 3), x_dir=(0, 0, 1), z_dir=(-1, 0, 0))) as chamfer_9_piece_2:
        Polygon((CHAMFER_9_SIZE, 0), (0, CHAMFER_9_SIZE), (0, 0), align=None)
    extrude(amount=6)
    with BuildSketch(Plane(origin=(-37, -53, 3), x_dir=(0, 0, 1), z_dir=(-1, 0, 0))) as chamfer_9_piece_3a_section:
        Polygon((CHAMFER_9_SIZE, 0), (0, CHAMFER_9_SIZE), (0, 0), align=None)
    chamfer_9_piece_3a = extrude(amount=11.143365976, mode=Mode.PRIVATE)
    chamfer_9_piece_3a = split(chamfer_9_piece_3a, bisect_by=Plane(origin=(-43, -53, 3), z_dir=(-1, 0, 0)), keep=Keep.TOP, mode=Mode.PRIVATE)
    with BuildSketch(Plane(origin=(-43, -47.856634024, 3), x_dir=(0, 0, 1), z_dir=(0, -1, 0))) as chamfer_9_piece_3b_section:
        Polygon((CHAMFER_9_SIZE, 0), (0, CHAMFER_9_SIZE), (0, 0), align=None)
    chamfer_9_piece_3b = extrude(amount=24.286731952, mode=Mode.PRIVATE)
    chamfer_9_piece_3b = split(chamfer_9_piece_3b, bisect_by=Plane(origin=(-43, -53, 3), z_dir=(0, 1, 0)), keep=Keep.TOP, mode=Mode.PRIVATE)
    chamfer_9_piece_3 = chamfer_9_piece_3a & chamfer_9_piece_3b
    add(chamfer_9_piece_3)
    with BuildSketch(Plane(origin=(-31.856634024, -53, 3), x_dir=(0, 0, 1), z_dir=(-1, 0, 0))) as chamfer_9_piece_4a_section:
        Polygon((CHAMFER_9_SIZE, 0), (0, CHAMFER_9_SIZE), (0, 0), align=None)
    chamfer_9_piece_4a = extrude(amount=11.143365976, mode=Mode.PRIVATE)
    chamfer_9_piece_4a = split(chamfer_9_piece_4a, bisect_by=Plane(origin=(-37, -53, 3), z_dir=(1, 0, 0)), keep=Keep.TOP, mode=Mode.PRIVATE)
    with BuildSketch(Plane(origin=(-37, -72.143365976, 3), x_dir=(0, 0, 1), z_dir=(0, 1, 0))) as chamfer_9_piece_4b_section:
        Polygon((CHAMFER_9_SIZE, 0), (0, CHAMFER_9_SIZE), (0, 0), align=None)
    chamfer_9_piece_4b = extrude(amount=24.286731952, mode=Mode.PRIVATE)
    chamfer_9_piece_4b = split(chamfer_9_piece_4b, bisect_by=Plane(origin=(-37, -53, 3), z_dir=(0, 1, 0)), keep=Keep.TOP, mode=Mode.PRIVATE)
    chamfer_9_piece_4 = chamfer_9_piece_4a & chamfer_9_piece_4b
    add(chamfer_9_piece_4)

    # 倒角10
    chamfer_10_edges = [part.edges().sort_by_distance(p)[0] for p in [
        (-47, -68, 2),
        (-33, -68, 2),
    ]]
    chamfer(chamfer_10_edges, length=CHAMFER_10_SIZE)

    # 倒角11
    chamfer_11_edges = [part.edges().sort_by_distance(p)[0] for p in [
        (-43, -68, 2.5),
        (-37, -68, 2.5),
    ]]
    chamfer(chamfer_11_edges, length=CHAMFER_11_SIZE)

    # 草图29 → 凸台-拉伸22 (add)
    with BuildSketch(Plane(origin=(0, -53, 0), x_dir=(1, 0, 0), z_dir=(0, 1, 0))):
        with Locations((-40, -19)):
            Rectangle(SKETCH_29_W, SKETCH_29_H)
    extrude(amount=EXTRUDE_22_DEPTH)

    # 草图30 → 凸台-拉伸23 (add)
    with BuildSketch(Plane(origin=(0, 0, 5), x_dir=(-1, 0, 0), z_dir=(0, 0, -1))):
        with Locations((40, -43)):
            Rectangle(SKETCH_30_W, SKETCH_30_H)
    extrude(amount=EXTRUDE_23_DEPTH)

    # 草图31 → 切除-拉伸10 (cut)
    with BuildSketch(Plane.XZ.offset(53).offset(CUT_EXTRUDE_START)):
        with Locations(Location((-40, 8, 0), (0, 0, 90))):
            Circle(SKETCH_31_R)
    extrude(amount=CUT_EXTRUDE_10_DEPTH, mode=Mode.SUBTRACT)

    # 草图32 → 切除-拉伸11 (cut)
    with BuildSketch(Plane.XY.offset(3)):
        with Locations((-75, 15)):
            Circle(SKETCH_32_R)
        with Locations((-75, 5)):
            Circle(SKETCH_32_R)
        with Locations((-5, 5)):
            Circle(SKETCH_32_R)
        with Locations((-5, 15)):
            Circle(SKETCH_32_R)
    extrude(amount=-CUT_EXTRUDE_11_DEPTH, mode=Mode.SUBTRACT)

    # 草图33 → 切除-拉伸12 (cut)
    with BuildSketch(Plane(origin=(0, -33, 0), x_dir=(1, 0, 0), z_dir=(0, 1, 0))):
        with Locations((-40, -18)):
            Rectangle(SKETCH_33_W, SKETCH_33_H)
    extrude(amount=-CUT_EXTRUDE_12_DEPTH, mode=Mode.SUBTRACT)

    # 草图34 → 切除-拉伸13 (cut)
    with BuildSketch(Plane.XY.offset(9)):
        Polygon((-37, -82), (-33, -82), (-33, -70), (-32, -69), (-37, -69), (-43, -69), (-48, -69), (-47, -70), (-47, -82), (-43, -82), align=None)
    extrude(amount=-CUT_EXTRUDE_13_DEPTH, mode=Mode.SUBTRACT)

    # 草图36 → 凸台-拉伸24 (add)
    with BuildSketch(Plane(origin=(-43, 0, 0), x_dir=(0, 0, -1), z_dir=(1, 0, 0))):
        with BuildLine():
            Line((-3, -82.5), (0, -82.5))
            ThreePointArc((0, -82.5), (-1.5, -84), (-3, -82.5))
        make_face()
    extrude(amount=EXTRUDE_24_DEPTH)

    # 草图37 → 凸台-拉伸25 (add, up to next)
    with BuildSketch(Plane(origin=(0, -82.5, 0), x_dir=(1, 0, 0), z_dir=(0, 1, 0)), mode=Mode.PRIVATE) as extrude_25_sk1:
        with Locations((-42, -1.5)):
            Rectangle(SKETCH_37_W, SKETCH_37_H)
    extrude_25_tool1 = extrude(extrude_25_sk1.sketch, amount=EXTRUDE_25_REACH, mode=Mode.PRIVATE) - part.part
    add(extrude_25_tool1.solids().sort_by_distance((-42, -82.5, 1.5))[0])

    # 草图38 → 凸台-拉伸26 (add)
    with BuildSketch(Plane(origin=(-41, 0, 0), x_dir=(0, 0, -1), z_dir=(1, 0, 0))):
        with BuildLine():
            Line((-2, -82.5), (-1, -82.5))
            ThreePointArc((-1, -82.5), (-1.5, -83), (-2, -82.5))
        make_face()
    extrude(amount=EXTRUDE_26_DEPTH)

    # 草图39 → 凸台-拉伸27 (add)
    with BuildSketch(Plane(origin=(-39, 0, 0), x_dir=(0, 0, -1), z_dir=(1, 0, 0))):
        with BuildLine():
            Line((-3, -82.5), (0, -82.5))
            ThreePointArc((0, -82.5), (-1.5, -84), (-3, -82.5))
        make_face()
    extrude(amount=EXTRUDE_27_DEPTH)

    # 草图40 → 凸台-拉伸28 (add, up to next)
    with BuildSketch(Plane(origin=(0, -82.5, 0), x_dir=(1, 0, 0), z_dir=(0, 1, 0)), mode=Mode.PRIVATE) as extrude_28_sk1:
        Polygon((-41, -1), (-41, -2), (-39, -2), (-39, -3), (-37, -3), (-37, 0), (-39, 0), (-39, -1), align=None)
    extrude_28_tool1 = extrude(extrude_28_sk1.sketch, amount=EXTRUDE_28_REACH, mode=Mode.PRIVATE) - part.part
    add(extrude_28_tool1.solids().sort_by_distance((-38.5, -82.5, 1.5))[0])

    # 倒角12
    chamfer_12_edges = [part.edges().sort_by_distance(p)[0] for p in [
        (-40, -68, 0),
    ]]
    chamfer(chamfer_12_edges, length=CHAMFER_12_SIZE - 0.0001)  # a hair under: the kernel refuses the full size


solid = part.part
